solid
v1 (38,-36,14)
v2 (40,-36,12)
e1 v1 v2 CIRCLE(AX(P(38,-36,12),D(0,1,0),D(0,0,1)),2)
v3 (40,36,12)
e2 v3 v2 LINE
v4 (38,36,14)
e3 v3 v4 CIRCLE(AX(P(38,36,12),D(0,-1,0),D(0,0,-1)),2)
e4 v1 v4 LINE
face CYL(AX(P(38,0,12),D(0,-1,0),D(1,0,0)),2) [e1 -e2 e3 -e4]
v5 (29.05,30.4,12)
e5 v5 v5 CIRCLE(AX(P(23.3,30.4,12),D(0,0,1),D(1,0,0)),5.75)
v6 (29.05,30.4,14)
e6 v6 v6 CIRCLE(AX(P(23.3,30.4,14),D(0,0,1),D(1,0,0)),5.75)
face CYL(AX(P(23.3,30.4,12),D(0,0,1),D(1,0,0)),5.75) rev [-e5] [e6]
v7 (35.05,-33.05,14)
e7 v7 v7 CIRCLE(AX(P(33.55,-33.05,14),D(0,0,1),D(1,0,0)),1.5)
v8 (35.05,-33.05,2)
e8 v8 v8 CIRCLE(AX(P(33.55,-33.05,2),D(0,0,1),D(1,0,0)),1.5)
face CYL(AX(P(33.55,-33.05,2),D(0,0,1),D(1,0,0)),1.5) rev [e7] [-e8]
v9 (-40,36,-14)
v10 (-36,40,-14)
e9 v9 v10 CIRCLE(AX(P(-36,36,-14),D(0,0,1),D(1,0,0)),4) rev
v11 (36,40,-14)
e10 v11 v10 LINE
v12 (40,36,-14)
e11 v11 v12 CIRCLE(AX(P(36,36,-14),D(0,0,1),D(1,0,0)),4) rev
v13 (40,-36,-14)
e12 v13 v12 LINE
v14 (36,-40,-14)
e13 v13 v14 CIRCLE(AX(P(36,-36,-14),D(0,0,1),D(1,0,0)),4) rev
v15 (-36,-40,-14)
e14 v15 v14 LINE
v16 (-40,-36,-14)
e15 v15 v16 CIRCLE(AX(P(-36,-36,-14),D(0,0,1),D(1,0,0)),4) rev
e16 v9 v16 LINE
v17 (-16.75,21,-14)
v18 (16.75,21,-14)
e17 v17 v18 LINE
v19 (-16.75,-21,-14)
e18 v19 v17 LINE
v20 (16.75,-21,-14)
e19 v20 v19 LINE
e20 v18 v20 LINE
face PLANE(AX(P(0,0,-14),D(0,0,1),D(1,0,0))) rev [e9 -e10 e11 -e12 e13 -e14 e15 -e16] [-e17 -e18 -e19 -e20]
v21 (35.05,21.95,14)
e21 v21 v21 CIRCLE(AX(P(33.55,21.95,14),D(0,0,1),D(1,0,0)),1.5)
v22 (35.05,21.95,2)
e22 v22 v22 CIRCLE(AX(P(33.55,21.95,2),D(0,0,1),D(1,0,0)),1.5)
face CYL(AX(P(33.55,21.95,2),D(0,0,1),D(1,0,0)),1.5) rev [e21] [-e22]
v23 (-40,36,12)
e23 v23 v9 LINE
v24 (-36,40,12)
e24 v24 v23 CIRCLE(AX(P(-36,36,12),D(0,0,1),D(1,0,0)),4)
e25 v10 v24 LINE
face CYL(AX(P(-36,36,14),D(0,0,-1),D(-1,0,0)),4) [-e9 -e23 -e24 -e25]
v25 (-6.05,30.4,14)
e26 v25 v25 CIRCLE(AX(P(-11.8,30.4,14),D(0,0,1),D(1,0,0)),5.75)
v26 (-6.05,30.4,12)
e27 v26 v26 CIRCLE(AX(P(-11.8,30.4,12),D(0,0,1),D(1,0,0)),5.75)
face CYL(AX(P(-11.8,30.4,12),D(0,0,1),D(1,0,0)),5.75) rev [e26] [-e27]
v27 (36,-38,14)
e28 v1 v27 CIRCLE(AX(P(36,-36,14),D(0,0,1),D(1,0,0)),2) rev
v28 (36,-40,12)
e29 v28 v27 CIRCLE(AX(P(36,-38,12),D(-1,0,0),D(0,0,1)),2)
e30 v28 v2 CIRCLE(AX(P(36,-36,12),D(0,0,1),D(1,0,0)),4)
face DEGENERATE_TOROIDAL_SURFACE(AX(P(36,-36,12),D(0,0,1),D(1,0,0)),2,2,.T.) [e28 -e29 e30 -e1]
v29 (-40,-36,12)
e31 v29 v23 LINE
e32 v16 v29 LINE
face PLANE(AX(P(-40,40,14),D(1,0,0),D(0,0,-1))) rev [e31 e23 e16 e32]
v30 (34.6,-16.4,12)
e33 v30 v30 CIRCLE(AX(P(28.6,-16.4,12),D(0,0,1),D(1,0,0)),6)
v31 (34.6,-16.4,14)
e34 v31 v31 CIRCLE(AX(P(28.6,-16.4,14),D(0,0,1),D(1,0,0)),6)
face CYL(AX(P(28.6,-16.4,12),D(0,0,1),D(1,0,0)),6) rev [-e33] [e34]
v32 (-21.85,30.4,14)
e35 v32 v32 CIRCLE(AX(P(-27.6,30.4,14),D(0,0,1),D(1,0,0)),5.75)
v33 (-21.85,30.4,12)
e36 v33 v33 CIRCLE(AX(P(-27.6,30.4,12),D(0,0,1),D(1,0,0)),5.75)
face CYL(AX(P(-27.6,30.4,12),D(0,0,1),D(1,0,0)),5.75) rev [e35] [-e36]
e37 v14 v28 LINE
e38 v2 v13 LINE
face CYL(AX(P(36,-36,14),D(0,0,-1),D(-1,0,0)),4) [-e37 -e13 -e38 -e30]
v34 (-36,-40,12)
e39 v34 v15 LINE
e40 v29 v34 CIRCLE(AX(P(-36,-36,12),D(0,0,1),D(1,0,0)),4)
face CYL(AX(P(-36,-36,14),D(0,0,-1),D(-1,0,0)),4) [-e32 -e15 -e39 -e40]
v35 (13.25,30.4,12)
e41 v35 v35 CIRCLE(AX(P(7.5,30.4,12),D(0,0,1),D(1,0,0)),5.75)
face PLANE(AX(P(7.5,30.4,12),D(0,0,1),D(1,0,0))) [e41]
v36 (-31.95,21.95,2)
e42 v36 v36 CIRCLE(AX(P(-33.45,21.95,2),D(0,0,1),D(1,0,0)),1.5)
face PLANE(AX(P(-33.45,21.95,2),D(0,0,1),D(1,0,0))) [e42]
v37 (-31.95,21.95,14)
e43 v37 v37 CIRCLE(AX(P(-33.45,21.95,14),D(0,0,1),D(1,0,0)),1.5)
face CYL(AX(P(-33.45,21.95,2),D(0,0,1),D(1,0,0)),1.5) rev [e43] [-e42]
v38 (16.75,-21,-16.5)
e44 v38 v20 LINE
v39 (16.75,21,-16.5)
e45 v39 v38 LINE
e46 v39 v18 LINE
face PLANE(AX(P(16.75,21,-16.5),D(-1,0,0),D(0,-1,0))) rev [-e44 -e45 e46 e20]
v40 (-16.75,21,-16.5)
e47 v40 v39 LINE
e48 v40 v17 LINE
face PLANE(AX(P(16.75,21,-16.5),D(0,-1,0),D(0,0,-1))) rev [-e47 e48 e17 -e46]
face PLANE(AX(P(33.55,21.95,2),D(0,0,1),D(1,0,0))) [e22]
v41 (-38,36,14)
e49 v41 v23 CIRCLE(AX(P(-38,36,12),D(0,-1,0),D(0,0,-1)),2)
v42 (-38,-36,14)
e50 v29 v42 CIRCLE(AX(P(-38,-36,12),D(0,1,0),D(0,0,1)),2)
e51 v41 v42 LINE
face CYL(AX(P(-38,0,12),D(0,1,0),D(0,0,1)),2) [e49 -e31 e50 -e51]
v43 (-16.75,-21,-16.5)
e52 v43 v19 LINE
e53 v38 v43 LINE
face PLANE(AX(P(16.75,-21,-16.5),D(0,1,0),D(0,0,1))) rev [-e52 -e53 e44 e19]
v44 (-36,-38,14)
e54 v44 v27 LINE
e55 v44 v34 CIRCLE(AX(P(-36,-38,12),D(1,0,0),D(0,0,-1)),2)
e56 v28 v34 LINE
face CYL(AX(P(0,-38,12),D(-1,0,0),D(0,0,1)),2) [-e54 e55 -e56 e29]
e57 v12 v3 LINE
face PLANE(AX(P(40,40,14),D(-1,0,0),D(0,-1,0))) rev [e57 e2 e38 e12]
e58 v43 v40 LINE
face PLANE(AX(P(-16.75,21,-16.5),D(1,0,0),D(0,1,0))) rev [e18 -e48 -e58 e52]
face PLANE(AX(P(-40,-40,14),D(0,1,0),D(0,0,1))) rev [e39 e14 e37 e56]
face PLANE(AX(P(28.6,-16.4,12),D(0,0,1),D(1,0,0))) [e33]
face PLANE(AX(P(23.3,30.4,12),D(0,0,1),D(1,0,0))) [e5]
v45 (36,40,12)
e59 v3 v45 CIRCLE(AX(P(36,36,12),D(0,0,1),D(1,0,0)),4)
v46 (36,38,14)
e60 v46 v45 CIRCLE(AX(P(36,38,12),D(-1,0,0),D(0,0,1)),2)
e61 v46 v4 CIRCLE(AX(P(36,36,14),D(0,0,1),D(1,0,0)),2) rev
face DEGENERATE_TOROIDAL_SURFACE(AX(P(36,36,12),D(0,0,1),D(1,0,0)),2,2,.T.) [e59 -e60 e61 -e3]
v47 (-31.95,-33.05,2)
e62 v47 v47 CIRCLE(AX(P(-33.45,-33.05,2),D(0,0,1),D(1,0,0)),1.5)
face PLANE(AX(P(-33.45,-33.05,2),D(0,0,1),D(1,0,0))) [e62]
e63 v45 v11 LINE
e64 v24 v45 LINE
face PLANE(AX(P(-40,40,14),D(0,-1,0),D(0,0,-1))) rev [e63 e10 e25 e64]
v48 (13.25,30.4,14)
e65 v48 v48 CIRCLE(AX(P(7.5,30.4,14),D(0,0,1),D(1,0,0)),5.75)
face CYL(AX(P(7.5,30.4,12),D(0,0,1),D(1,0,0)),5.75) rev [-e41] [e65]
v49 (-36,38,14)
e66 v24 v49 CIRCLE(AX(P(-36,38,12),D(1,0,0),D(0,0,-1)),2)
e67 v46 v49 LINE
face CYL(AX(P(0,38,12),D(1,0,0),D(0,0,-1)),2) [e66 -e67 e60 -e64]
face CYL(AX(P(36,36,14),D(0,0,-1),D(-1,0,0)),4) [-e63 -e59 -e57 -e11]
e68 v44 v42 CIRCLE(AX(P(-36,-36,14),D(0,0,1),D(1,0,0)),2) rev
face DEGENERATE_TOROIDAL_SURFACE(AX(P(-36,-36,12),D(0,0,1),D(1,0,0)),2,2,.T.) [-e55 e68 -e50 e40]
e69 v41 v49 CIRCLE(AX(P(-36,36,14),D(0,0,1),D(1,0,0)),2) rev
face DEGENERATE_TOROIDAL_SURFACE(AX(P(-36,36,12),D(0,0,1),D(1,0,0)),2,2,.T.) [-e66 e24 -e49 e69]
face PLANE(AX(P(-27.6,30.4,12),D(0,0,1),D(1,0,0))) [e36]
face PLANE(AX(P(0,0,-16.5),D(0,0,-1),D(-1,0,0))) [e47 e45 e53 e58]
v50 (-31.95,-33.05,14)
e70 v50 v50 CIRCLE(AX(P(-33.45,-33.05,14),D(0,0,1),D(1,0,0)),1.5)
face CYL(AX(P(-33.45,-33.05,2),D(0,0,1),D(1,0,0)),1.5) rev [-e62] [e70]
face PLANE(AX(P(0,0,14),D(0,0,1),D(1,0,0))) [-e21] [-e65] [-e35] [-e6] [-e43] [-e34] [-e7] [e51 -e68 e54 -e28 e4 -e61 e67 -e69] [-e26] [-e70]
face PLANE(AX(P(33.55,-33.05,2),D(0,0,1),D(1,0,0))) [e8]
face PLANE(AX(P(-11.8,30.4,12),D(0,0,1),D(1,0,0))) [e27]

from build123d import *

# Parameters (mm, degrees)
SKETCH1_W           = 80
SKETCH1_H           = 80
BOSS_EXTRUDE1_DEPTH = 14
FILLET1_R           = 2
FILLET2_R           = 4
SKETCH2_R           = 5.75
CUT_EXTRUDE1_DEPTH  = 2
SKETCH3_R           = 1.5
CUT_EXTRUDE2_DEPTH  = 12
SKETCH6_R           = 6
CUT_EXTRUDE3_DEPTH  = 2
SKETCH7_W           = 33.5
SKETCH7_H           = 42
BOSS_EXTRUDE2_DEPTH = 2.5


with BuildPart() as part:
    # Sketch1 → Boss-Extrude1 (new, symmetric)
    with BuildSketch(Plane.XY):
        Rectangle(SKETCH1_W, SKETCH1_H)
    extrude(amount=BOSS_EXTRUDE1_DEPTH, both=True)

    # Fillet1
    fillet1_edges = [part.edges().sort_by_distance(p)[0] for p in [
        (-40, 0, 14),
        (0, -40, 14),
        (40, 0, 14),
        (0, 40, 14),
    ]]
    fillet(fillet1_edges, radius=FILLET1_R)

    # Fillet2
    # the kernel refuses this fillet: 4 mm, written as the material it takes off along each edge
    with BuildSketch(Plane(origin=(-36, -36, 14), x_dir=(-1, 0, 0), z_dir=(0, 1, 0))) as fillet2_piece_1:
        with BuildLine():
            CenterArc((2, -2), 2, 0, 90)
            Line((4, -2), (4, 0))
            Line((4, 0), (2, 0))
        make_face()
    revolve(axis=Axis((-36, -36, 14), (0, 0, 1)), revolution_arc=90, mode=Mode.SUBTRACT)
    with BuildSketch(Plane(origin=(-36, 36, 14), x_dir=(0, 1, 0), z_dir=(1, 0, 0))) as fillet2_piece_2:
        with BuildLine():
            CenterArc((2, -2), 2, 0, 90)
            Line((4, -2), (4, 0))
            Line((4, 0), (2, 0))
        make_face()
    revolve(axis=Axis((-36, 36, 14), (0, 0, 1)), revolution_arc=90, mode=Mode.SUBTRACT)
    with BuildSketch(Plane(origin=(36, -36, 14), x_dir=(0, -1, 0), z_dir=(-1, 0, 0))) as fillet2_piece_3:
        with BuildLine():
            CenterArc((2, -2), 2, 0, 90)
            Line((4, -2), (4, 0))
            Line((4, 0), (2, 0))
        make_face()
    revolve(axis=Axis((36, -36, 14), (0, 0, 1)), revolution_arc=90, mode=Mode.SUBTRACT)
    with BuildSketch(Plane(origin=(36, 36, 14), x_dir=(1, 0, 0), z_dir=(0, -1, 0))) as fillet2_piece_4:
        with BuildLine():
            CenterArc((2, -2), 2, 0, 90)
            Line((4, -2), (4, 0))
            Line((4, 0), (2, 0))
        make_face()
    revolve(axis=Axis((36, 36, 14), (0, 0, 1)), revolution_arc=90, mode=Mode.SUBTRACT)
    with BuildSketch(Plane(origin=(40, 40, 14), x_dir=(-1, 0, 0), z_dir=(0, 0, -1)), Plane(origin=(40, -40, 14), x_dir=(0, 1, 0), z_dir=(0, 0, -1)), Plane(origin=(-40, -40, -24), x_dir=(0, 1, 0), z_dir=(0, 0, 1)), Plane(origin=(-40, 40, -24), x_dir=(1, 0, 0), z_dir=(0, 0, 1))) as fillet2_piece_5:
        with BuildLine():
            CenterArc((FILLET2_R, -FILLET2_R), FILLET2_R, 90, 90)
            Line((0, -FILLET2_R), (0, 0))
            Line((0, 0), (FILLET2_R, 0))
        make_face()
    extrude(amount=38, mode=Mode.SUBTRACT)

    # Sketch2 → Cut-Extrude1 (cut)
    with BuildSketch(Plane.XY.offset(14)):
        with Locations((-27.6, 30.4)):
            Circle(SKETCH2_R)
        with Locations((-11.8, 30.4)):
            Circle(SKETCH2_R)
        with Locations((7.5, 30.4)):
            Circle(SKETCH2_R)
        with Locations((23.3, 30.4)):
            Circle(SKETCH2_R)
    extrude(amount=-CUT_EXTRUDE1_DEPTH, mode=Mode.SUBTRACT)

    # Sketch3 → Cut-Extrude2 (cut)
    with BuildSketch(Plane.XY.offset(14)):
        with Locations((-33.45, 21.95)):
            Circle(SKETCH3_R)
        with Locations((33.55, 21.95)):
            Circle(SKETCH3_R)
        with Locations((-33.45, -33.05)):
            Circle(SKETCH3_R)
        with Locations((33.55, -33.05)):
            Circle(SKETCH3_R)
    extrude(amount=-CUT_EXTRUDE2_DEPTH, mode=Mode.SUBTRACT)

    # Sketch6 → Cut-Extrude3 (cut)
    with BuildSketch(Plane.XY.offset(14)):
        with Locations((28.6, -16.4)):
            Circle(SKETCH6_R)
    extrude(amount=-CUT_EXTRUDE3_DEPTH, mode=Mode.SUBTRACT)

    # Sketch7 → Boss-Extrude2 (add)
    with BuildSketch(Plane(origin=(0, 0, -14), x_dir=(-1, 0, 0), z_dir=(0, 0, -1))):
        Rectangle(SKETCH7_W, SKETCH7_H)
    extrude(amount=BOSS_EXTRUDE2_DEPTH)


solid = part.part
